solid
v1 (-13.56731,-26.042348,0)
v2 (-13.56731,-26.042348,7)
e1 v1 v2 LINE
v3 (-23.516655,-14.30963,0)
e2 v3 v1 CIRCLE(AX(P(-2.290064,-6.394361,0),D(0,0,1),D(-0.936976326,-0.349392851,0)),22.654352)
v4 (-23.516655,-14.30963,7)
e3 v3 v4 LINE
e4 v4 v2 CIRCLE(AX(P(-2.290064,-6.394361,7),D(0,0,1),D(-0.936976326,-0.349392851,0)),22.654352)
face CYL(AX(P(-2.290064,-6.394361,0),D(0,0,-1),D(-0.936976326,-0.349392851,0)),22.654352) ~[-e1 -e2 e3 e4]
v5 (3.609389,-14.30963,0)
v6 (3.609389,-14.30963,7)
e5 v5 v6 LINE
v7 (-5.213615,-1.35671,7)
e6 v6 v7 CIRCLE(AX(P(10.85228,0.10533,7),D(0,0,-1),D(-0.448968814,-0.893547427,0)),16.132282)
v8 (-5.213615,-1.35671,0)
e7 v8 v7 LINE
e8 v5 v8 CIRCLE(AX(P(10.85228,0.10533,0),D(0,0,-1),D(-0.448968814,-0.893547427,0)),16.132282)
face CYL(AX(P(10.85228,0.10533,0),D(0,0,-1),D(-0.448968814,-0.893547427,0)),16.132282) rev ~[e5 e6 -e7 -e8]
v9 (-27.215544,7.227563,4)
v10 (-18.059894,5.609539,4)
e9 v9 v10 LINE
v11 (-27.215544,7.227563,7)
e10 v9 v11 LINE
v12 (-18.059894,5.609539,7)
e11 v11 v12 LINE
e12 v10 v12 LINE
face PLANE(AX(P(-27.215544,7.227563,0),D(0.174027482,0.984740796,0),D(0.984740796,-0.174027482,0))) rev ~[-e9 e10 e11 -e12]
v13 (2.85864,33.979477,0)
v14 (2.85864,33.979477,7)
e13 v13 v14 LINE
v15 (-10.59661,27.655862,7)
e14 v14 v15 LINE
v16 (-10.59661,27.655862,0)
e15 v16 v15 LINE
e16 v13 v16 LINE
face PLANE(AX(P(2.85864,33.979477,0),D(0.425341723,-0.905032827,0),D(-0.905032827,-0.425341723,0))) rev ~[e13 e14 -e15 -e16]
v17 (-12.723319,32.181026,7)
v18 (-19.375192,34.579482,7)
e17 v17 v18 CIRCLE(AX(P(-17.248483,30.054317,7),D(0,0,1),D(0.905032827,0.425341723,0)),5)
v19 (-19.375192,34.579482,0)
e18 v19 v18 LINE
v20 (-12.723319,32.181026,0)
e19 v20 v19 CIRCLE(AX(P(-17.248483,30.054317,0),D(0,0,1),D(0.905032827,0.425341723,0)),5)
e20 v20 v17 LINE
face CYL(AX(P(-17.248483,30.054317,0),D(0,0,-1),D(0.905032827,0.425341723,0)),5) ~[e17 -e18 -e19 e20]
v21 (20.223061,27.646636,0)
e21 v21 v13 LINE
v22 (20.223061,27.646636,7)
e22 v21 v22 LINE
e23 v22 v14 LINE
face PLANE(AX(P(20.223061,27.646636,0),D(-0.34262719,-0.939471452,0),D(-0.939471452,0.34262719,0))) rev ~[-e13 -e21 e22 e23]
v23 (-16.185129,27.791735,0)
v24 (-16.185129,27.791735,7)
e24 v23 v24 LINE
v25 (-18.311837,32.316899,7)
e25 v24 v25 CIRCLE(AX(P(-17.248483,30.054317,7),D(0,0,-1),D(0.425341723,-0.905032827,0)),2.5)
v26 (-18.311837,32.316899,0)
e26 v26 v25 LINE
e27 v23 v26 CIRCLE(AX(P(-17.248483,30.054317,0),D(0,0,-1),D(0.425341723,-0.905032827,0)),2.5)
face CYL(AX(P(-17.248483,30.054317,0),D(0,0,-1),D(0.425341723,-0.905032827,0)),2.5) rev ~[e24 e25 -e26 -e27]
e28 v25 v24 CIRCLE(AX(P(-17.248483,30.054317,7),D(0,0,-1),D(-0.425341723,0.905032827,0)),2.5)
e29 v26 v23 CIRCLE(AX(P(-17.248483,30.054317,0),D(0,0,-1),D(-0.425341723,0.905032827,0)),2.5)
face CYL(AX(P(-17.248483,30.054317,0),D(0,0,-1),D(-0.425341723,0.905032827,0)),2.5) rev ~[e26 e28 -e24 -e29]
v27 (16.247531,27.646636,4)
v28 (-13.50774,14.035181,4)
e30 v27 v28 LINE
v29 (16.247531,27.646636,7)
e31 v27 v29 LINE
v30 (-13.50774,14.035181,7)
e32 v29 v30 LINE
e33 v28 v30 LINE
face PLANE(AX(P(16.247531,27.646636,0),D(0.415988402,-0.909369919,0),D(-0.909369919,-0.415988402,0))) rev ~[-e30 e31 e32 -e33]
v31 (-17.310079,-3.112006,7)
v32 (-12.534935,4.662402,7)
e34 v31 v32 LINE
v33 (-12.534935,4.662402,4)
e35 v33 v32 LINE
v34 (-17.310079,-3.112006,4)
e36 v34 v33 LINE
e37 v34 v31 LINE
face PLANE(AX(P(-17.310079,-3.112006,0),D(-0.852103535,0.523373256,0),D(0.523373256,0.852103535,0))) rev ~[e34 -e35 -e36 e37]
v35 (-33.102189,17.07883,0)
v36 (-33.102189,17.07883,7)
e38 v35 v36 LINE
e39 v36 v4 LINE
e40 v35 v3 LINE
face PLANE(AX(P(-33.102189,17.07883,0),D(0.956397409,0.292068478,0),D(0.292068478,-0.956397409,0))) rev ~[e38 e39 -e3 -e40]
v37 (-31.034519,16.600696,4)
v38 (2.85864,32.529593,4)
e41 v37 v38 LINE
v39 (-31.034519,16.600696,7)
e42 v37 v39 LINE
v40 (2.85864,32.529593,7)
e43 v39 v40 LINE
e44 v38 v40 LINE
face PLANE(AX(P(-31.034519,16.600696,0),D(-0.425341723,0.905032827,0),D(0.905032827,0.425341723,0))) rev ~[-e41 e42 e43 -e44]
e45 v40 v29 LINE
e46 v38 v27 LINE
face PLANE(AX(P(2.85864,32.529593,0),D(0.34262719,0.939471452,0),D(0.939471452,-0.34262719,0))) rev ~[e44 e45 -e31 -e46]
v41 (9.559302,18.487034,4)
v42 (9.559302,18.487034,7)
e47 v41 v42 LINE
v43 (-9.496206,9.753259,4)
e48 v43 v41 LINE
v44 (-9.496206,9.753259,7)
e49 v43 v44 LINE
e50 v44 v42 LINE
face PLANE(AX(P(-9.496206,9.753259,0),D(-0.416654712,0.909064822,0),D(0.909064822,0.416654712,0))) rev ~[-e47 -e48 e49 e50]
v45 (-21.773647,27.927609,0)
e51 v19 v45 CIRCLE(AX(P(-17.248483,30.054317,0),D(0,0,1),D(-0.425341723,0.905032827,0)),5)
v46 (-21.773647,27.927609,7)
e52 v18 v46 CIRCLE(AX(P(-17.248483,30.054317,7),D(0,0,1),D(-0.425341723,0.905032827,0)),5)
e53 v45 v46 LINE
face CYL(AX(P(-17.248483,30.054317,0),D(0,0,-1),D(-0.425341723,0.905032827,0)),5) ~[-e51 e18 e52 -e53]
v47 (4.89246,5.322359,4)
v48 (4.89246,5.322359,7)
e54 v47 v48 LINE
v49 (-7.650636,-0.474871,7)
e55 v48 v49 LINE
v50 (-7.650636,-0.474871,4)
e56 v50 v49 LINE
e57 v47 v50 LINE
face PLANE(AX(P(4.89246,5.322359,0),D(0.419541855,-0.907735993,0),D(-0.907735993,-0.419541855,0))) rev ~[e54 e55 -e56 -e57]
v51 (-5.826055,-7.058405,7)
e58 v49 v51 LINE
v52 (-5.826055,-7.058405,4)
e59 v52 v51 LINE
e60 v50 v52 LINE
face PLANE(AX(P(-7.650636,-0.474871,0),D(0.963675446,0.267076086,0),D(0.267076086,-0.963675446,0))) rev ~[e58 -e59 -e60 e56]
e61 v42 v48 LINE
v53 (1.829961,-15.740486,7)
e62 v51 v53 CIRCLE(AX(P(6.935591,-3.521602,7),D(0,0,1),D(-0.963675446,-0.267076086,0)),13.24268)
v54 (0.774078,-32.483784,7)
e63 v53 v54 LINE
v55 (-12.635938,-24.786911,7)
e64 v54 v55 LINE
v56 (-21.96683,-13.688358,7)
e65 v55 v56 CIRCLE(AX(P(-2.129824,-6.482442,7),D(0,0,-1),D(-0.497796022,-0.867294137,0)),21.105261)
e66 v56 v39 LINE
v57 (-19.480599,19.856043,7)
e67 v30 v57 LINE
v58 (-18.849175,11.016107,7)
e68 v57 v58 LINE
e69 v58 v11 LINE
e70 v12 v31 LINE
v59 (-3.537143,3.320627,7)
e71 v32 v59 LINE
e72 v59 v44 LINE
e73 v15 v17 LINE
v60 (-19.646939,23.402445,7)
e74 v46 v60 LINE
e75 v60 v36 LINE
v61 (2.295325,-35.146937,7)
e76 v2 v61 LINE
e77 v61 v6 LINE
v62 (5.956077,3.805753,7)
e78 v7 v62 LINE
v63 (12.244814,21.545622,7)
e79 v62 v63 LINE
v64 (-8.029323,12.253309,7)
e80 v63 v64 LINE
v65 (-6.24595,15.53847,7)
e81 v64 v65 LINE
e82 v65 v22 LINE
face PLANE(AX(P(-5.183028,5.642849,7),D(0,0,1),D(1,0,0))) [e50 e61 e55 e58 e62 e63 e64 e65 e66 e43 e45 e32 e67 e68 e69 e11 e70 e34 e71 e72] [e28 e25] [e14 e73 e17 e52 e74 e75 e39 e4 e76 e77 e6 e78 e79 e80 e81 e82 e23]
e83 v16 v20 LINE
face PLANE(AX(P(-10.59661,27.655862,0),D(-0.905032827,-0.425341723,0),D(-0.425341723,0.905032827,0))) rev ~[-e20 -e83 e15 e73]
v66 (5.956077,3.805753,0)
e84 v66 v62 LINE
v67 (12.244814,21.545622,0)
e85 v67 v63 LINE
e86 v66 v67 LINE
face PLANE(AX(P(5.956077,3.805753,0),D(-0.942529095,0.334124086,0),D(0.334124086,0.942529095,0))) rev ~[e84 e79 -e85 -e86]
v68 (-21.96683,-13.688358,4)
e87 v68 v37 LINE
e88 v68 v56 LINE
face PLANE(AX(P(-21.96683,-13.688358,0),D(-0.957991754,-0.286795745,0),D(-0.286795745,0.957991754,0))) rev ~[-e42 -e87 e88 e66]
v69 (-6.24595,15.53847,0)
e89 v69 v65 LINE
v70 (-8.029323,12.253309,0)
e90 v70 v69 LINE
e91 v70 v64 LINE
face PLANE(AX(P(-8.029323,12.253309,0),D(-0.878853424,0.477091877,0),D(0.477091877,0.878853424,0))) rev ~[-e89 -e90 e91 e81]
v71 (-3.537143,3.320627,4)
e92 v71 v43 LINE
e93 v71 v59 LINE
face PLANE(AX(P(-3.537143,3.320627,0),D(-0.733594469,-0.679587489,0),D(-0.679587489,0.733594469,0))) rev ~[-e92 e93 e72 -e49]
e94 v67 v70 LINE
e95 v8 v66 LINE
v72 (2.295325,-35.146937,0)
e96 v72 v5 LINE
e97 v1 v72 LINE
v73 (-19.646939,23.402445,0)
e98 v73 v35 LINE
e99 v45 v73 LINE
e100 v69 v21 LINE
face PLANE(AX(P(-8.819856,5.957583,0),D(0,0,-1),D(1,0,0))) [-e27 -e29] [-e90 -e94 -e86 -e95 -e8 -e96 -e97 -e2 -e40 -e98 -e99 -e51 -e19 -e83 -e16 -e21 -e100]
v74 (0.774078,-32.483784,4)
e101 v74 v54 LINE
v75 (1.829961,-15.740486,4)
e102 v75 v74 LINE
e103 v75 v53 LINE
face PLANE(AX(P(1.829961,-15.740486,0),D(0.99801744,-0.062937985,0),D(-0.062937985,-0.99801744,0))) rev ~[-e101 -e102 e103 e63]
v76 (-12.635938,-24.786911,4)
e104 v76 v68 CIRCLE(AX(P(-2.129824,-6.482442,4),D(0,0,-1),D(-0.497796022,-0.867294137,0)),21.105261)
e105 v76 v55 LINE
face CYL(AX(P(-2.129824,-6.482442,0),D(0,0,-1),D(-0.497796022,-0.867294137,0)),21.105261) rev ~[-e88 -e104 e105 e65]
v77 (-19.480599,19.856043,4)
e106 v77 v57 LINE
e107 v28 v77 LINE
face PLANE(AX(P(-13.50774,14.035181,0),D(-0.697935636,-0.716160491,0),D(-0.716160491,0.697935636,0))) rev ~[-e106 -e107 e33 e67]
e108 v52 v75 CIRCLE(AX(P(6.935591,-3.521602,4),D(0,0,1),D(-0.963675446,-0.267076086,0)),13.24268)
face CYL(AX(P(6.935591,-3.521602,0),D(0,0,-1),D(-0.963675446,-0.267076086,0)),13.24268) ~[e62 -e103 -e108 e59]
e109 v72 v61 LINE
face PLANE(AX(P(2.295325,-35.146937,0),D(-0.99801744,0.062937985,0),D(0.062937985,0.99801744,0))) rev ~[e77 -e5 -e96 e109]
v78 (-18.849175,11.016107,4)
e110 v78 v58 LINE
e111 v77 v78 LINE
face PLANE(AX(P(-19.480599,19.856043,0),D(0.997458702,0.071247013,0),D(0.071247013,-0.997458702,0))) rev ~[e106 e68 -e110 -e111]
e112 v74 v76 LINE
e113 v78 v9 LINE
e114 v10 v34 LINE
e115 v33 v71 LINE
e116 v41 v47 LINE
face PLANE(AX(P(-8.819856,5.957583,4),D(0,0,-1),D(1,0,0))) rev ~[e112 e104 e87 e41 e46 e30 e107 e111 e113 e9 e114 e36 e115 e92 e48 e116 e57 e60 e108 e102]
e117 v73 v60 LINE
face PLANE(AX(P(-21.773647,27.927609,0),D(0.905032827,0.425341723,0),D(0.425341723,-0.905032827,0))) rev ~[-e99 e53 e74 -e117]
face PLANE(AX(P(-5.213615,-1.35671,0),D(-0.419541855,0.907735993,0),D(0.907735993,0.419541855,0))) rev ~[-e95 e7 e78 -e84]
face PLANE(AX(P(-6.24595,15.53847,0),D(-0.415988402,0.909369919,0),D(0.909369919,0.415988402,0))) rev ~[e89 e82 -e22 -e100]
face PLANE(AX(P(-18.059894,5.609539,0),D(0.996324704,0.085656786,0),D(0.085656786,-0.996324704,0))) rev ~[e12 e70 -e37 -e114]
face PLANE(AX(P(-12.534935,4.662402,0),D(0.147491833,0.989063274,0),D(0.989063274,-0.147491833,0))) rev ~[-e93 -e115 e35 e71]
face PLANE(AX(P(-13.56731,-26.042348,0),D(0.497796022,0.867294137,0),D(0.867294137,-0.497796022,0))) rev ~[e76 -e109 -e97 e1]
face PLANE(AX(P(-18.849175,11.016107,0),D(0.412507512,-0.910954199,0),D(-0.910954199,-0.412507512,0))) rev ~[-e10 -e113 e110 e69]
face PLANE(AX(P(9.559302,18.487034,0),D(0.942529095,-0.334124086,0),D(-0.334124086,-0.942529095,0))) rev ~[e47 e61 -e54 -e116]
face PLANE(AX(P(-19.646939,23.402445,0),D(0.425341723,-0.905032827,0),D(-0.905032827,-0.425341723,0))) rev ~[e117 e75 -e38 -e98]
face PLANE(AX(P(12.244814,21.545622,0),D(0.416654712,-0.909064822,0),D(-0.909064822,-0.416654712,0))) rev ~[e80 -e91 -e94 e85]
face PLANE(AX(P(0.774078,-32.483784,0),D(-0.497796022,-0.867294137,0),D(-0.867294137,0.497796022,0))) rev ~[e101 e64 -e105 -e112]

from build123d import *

# Parameters (mm, degrees)
F1_DEPTH = 7
F3_DEPTH = 4


# Not quite as in the source:
# - a feature names something its author has since deleted; it is built from what else it names


with BuildPart() as f1:
    # F0 (on Top) → F1 (new body)
    with BuildSketch(Plane.XY):
        with BuildLine():
            Line((-19.6469386943, 23.4024446265), (-33.1021886284, 17.0788295944))
            Line((-33.1021886284, 17.0788295944), (-23.5166549683, -14.3096297979))
            ThreePointArc((-23.5166549683, -14.3096297979), (-19.5683456994, -21.0463448921), (-13.5673098266, -26.0423477739))
            Line((-13.5673098266, -26.0423477739), (2.2953252774, -35.1469367743))
            Line((2.2953252774, -35.1469367743), (3.609388601, -14.3096297979))
            ThreePointArc((3.609388601, -14.3096297979), (-2.48073947, -8.9765820448), (-5.2136145532, -1.3567098649))
            Line((-5.2136145532, -1.3567098649), (5.9560768355, 3.8057526561))
            Line((5.9560768355, 3.8057526561), (12.2448138941, 21.5456220774))
            Line((12.2448138941, 21.5456220774), (-8.0293232526, 12.2533091797))
            Line((-8.0293232526, 12.2533091797), (-6.2459499526, 15.5384703992))
            Line((-6.2459499526, 15.5384703992), (20.2230613727, 27.64663617))
            Line((20.2230613727, 27.64663617), (2.8586395134, 33.9794768895))
            Line((2.8586395134, 33.9794768895), (-10.5966104207, 27.6558618574))
            Line((-10.5966104207, 27.6558618574), (-15.1217745575, 25.529153242))
            Line((-15.1217745575, 25.529153242), (-19.6469386943, 23.4024446265))
        make_face()
        with BuildLine():
            Line((-21.966829896, -13.6883575469), (-31.0345193002, 16.6006959636))
            Line((-31.0345193002, 16.6006959636), (2.8586395134, 32.5295928335))
            Line((2.8586395134, 32.5295928335), (16.2475313521, 27.64663617))
            Line((16.2475313521, 27.64663617), (-13.5077397905, 14.0351812079))
            Line((-13.5077397905, 14.0351812079), (-19.4805990905, 19.85604316))
            Line((-19.4805990905, 19.85604316), (-18.8491754234, 11.0161071643))
            Line((-18.8491754234, 11.0161071643), (-27.2155441344, 7.2275632992))
            Line((-27.2155441344, 7.2275632992), (-18.0598944426, 5.6095388718))
            Line((-18.0598944426, 5.6095388718), (-17.3100791872, -3.1120055355))
            Line((-17.3100791872, -3.1120055355), (-12.5349350274, 4.6624024399))
            Line((-12.5349350274, 4.6624024399), (-3.5371426493, 3.3206269145))
            Line((-3.5371426493, 3.3206269145), (-9.4962064177, 9.7532588989))
            Line((-9.4962064177, 9.7532588989), (9.5593021267, 18.4870336848))
            Line((9.5593021267, 18.4870336848), (4.8924595123, 5.3223588356))
            Line((4.8924595123, 5.3223588356), (-7.6506364332, -0.4748705114))
            Line((-7.6506364332, -0.4748705114), (-5.8260546066, -7.0584053174))
            ThreePointArc((-5.8260546066, -7.0584053174), (-2.996906843, -12.2802585435), (1.8299611984, -15.7404858619))
            Line((1.8299611984, -15.7404858619), (0.7740783702, -32.4837844721))
            Line((0.7740783702, -32.4837844721), (-12.6359384992, -24.7869112046))
            ThreePointArc((-12.6359384992, -24.7869112046), (-18.2844119376, -20.0640956756), (-21.966829896, -13.6883575469))
        make_face(mode=Mode.SUBTRACT)
        with BuildLine():
            Line((-21.7736473098, 27.9276087633), (-19.6469386943, 23.4024446265))
            Line((-19.6469386943, 23.4024446265), (-15.1217745575, 25.529153242))
            Line((-15.1217745575, 25.529153242), (-10.5966104207, 27.6558618574))
            Line((-10.5966104207, 27.6558618574), (-12.7233190362, 32.1810259942))
            ThreePointArc((-12.7233190362, 32.1810259942), (-15.5525190095, 34.7579017095), (-19.3751917885, 34.5794815155))
            ThreePointArc((-19.3751917885, 34.5794815155), (-21.9520675037, 31.7502815423), (-21.7736473098, 27.9276087633))
        make_face()
        with BuildLine():
            ThreePointArc((-18.3118374807, 32.3168994471), (-14.9859011046, 31.1176716865), (-16.1851288653, 27.7917353104))
            ThreePointArc((-16.1851288653, 27.7917353104), (-19.5110652414, 28.990963071), (-18.3118374807, 32.3168994471))
        make_face(mode=Mode.SUBTRACT)
    extrude(amount=F1_DEPTH)

    # F2 (on face) → F3 (join)
    with BuildSketch(Plane(origin=(0, 0, 0), x_dir=(1, 0, 0), z_dir=(0, 0, -1))):
        with BuildLine():
            ThreePointArc((-12.6359384992, 24.7869112046), (-18.2844119376, 20.0640956756), (-21.966829896, 13.6883575469))
            Line((-21.966829896, 13.6883575469), (-31.0345193002, -16.6006959636))
            Line((-31.0345193002, -16.6006959636), (2.8586395134, -32.5295928335))
            Line((2.8586395134, -32.5295928335), (16.2475313521, -27.64663617))
            Line((16.2475313521, -27.64663617), (-13.5077397905, -14.0351812079))
            Line((-13.5077397905, -14.0351812079), (-19.4805990905, -19.85604316))
            Line((-19.4805990905, -19.85604316), (-18.8491754234, -11.0161071643))
            Line((-18.8491754234, -11.0161071643), (-27.2155441344, -7.2275632992))
            Line((-27.2155441344, -7.2275632992), (-18.0598944426, -5.6095388718))
            Line((-18.0598944426, -5.6095388718), (-17.3100791872, 3.1120055355))
            Line((-17.3100791872, 3.1120055355), (-12.5349350274, -4.6624024399))
            Line((-12.5349350274, -4.6624024399), (-3.5371426493, -3.3206269145))
            Line((-3.5371426493, -3.3206269145), (-9.4962064177, -9.7532588989))
            Line((-9.4962064177, -9.7532588989), (9.5593021267, -18.4870336848))
            Line((9.5593021267, -18.4870336848), (4.8924595123, -5.3223588356))
            Line((4.8924595123, -5.3223588356), (-7.6506364332, 0.4748705114))
            Line((-7.6506364332, 0.4748705114), (-5.8260546066, 7.0584053174))
            ThreePointArc((-5.8260546066, 7.0584053174), (-2.996906843, 12.2802585435), (1.8299611984, 15.7404858619))
            Line((1.8299611984, 15.7404858619), (0.7740783702, 32.4837844721))
            Line((0.7740783702, 32.4837844721), (-12.6359384992, 24.7869112046))
        make_face()
    extrude(amount=-F3_DEPTH)


solid = f1.part
